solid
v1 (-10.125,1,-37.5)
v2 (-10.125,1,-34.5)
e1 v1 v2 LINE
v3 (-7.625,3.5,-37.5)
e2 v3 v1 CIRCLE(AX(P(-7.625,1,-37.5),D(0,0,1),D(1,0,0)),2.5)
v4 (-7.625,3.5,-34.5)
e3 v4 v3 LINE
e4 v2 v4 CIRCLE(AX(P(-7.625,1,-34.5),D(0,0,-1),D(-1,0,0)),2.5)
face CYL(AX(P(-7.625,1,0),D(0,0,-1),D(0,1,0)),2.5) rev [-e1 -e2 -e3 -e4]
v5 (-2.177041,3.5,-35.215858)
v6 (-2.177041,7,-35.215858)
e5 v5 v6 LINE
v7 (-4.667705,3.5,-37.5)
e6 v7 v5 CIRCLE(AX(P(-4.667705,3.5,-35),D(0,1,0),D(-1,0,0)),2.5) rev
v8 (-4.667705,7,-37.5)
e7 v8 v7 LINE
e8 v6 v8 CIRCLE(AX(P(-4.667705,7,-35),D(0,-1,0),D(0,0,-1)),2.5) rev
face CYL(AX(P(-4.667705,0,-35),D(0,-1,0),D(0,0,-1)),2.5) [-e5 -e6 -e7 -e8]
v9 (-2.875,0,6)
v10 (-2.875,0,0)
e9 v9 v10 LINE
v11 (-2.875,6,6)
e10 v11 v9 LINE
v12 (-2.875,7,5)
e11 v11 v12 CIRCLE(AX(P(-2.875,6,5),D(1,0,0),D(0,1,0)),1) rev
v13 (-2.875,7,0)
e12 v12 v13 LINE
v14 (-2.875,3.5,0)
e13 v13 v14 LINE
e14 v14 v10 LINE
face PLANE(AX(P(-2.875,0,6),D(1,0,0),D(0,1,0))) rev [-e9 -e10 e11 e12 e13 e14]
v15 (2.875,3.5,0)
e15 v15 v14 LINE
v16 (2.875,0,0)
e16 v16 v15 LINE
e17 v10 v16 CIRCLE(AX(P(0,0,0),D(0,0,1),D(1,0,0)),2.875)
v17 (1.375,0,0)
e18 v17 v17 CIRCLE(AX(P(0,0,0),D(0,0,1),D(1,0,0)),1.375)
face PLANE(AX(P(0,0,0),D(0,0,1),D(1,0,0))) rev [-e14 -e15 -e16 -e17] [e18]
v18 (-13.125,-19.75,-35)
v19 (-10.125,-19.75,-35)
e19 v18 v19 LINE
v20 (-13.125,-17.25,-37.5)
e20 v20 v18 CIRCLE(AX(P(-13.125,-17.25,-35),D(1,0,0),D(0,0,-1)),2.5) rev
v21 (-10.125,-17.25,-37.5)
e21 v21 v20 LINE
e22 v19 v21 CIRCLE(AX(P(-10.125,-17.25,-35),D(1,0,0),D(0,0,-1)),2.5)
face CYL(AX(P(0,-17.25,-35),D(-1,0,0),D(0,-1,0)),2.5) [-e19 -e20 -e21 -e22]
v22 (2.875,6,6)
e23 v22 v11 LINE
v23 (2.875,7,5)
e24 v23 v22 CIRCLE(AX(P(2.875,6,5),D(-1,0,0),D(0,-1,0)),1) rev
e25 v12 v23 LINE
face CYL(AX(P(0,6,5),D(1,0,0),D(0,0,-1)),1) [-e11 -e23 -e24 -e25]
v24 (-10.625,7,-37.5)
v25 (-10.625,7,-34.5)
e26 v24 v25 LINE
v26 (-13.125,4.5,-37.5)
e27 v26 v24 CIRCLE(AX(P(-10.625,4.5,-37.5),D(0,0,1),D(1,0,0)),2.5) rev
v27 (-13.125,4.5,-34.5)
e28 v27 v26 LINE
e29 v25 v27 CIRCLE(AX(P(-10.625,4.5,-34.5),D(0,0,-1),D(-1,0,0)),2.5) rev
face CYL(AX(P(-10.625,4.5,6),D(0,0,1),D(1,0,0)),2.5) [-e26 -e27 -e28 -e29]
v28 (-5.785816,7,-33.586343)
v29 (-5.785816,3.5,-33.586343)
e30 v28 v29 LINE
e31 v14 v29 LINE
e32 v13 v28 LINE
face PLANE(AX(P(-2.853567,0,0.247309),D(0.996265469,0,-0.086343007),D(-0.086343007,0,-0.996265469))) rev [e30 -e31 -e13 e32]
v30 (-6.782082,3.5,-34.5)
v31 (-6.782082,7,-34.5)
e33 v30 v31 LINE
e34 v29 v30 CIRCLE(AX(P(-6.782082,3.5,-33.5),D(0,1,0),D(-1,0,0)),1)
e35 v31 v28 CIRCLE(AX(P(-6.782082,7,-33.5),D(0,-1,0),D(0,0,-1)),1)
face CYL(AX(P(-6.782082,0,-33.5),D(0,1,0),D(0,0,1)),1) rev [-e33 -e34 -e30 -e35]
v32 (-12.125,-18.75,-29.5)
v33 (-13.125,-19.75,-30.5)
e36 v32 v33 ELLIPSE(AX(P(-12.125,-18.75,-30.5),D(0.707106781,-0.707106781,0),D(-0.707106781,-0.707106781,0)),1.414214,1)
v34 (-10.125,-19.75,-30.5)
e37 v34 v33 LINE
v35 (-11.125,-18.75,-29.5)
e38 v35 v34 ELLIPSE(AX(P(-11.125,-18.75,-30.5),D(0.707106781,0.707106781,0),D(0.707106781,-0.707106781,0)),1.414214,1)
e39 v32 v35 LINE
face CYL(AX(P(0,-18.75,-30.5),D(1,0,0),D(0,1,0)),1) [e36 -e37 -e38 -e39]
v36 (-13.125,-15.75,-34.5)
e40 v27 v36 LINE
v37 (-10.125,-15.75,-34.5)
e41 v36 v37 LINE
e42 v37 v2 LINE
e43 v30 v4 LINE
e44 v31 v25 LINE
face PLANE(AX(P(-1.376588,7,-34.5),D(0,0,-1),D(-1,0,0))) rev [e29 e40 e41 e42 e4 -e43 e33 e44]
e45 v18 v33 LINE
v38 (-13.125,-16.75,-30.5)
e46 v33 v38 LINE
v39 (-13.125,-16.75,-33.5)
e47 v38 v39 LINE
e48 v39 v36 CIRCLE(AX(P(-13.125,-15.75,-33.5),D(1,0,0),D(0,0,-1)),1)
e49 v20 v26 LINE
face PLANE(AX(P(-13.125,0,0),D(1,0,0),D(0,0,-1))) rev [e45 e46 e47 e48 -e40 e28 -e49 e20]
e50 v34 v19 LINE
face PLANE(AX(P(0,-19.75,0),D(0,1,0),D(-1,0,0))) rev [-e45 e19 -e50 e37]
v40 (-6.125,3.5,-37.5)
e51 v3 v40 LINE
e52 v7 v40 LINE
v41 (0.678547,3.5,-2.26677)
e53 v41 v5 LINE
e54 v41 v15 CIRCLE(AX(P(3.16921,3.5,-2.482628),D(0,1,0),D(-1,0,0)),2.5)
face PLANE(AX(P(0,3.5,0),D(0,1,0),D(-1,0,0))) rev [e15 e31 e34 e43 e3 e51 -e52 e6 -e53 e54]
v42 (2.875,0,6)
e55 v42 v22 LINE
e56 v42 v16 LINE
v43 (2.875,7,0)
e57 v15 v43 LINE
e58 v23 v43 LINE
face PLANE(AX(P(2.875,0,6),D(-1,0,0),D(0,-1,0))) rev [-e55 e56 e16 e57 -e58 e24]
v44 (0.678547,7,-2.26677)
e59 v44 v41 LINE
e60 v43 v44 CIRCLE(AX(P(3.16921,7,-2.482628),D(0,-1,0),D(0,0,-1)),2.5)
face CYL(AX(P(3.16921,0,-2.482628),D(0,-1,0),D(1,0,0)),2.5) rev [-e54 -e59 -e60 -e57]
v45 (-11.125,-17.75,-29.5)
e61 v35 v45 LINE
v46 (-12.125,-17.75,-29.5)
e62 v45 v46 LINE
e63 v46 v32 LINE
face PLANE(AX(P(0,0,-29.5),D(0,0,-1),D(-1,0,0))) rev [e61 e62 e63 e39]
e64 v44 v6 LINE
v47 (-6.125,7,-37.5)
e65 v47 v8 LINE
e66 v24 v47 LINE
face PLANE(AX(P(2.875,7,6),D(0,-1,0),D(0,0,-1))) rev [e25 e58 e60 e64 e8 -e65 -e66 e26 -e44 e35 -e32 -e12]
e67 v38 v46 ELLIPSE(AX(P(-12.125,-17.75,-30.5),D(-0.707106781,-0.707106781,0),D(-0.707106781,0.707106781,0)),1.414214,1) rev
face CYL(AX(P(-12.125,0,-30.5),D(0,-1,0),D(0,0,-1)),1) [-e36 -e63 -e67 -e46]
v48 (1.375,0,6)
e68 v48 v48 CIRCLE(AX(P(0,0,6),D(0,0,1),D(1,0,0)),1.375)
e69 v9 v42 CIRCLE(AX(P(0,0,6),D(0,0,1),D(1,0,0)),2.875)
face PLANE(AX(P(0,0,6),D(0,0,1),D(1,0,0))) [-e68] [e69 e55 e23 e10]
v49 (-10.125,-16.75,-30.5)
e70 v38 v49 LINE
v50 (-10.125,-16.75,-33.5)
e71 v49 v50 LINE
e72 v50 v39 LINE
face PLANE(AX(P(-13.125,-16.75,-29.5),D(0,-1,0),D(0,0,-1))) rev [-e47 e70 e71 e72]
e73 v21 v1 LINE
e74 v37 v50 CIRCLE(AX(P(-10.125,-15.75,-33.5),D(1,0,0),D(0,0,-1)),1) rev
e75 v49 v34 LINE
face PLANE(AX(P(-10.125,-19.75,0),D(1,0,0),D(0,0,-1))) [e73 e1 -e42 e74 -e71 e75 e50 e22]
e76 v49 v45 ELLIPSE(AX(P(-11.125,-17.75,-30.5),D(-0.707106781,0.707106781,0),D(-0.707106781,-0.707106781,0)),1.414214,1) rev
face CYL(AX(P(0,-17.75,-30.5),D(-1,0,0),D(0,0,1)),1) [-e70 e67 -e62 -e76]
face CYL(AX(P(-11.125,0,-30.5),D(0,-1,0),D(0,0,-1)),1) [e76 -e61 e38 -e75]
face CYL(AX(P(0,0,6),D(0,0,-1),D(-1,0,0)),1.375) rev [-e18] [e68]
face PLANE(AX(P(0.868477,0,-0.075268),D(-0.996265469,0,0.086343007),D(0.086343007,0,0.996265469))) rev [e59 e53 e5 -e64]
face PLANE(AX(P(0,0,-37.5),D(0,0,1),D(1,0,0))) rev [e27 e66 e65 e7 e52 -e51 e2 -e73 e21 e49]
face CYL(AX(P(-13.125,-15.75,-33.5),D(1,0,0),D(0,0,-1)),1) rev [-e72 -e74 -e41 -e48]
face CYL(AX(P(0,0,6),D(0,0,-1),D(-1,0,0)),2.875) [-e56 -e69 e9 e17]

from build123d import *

# Parameters (mm, degrees)
SKETCH1_R           = 1.375
BOSS_EXTRUDE1_DEPTH = 6
BOSS_EXTRUDE2_START = -13.125
SKETCH9_W           = 3.5
SKETCH9_H           = 3
BOSS_EXTRUDE2_DEPTH = 7.26
BOSS_EXTRUDE3_START = -26.75
SKETCH10_W          = 3
SKETCH10_H          = 3
BOSS_EXTRUDE3_DEPTH = 23.25
SKETCH11_W          = 3
SKETCH11_H          = 3
BOSS_EXTRUDE4_DEPTH = 5
FILLET1_R           = 2.5
FILLET2_R           = 1


with BuildPart() as part:
    # Sketch1 → Boss-Extrude1 (new body)
    with BuildSketch(Plane(origin=(0, 0, 0), x_dir=(0, 1, 0), z_dir=(0, 0, 1))):
        with BuildLine():
            Line((0, 2.875), (7, 2.875))
            Line((7, 2.875), (7, -2.875))
            Line((7, -2.875), (0, -2.875))
            ThreePointArc((0, -2.875), (-2.875, 0), (0, 2.875))
        make_face()
        with Locations(Location((0, 0, 0), (0, 0, 270))):
            Circle(SKETCH1_R, mode=Mode.SUBTRACT)
    extrude(amount=BOSS_EXTRUDE1_DEPTH)

    # Sketch2 → Loft1 section 0
    with BuildSketch(Plane(origin=(0, 0, 0), x_dir=(1, 0, 0), z_dir=(0, 0, -1))):
        with BuildLine():
            Line((0.875, -7), (-2.875, -7))
            Line((-2.875, -7), (-2.875, -3.5))
            Line((-2.875, -3.5), (0.875, -3.5))
            Line((0.875, -3.5), (0.875, -7))
        make_face()
    # Sketch8 → Loft1 section 1
    with BuildSketch(Plane(origin=(0, 0, -37.5), x_dir=(-1, 0, 0), z_dir=(0, 0, -1))):
        with BuildLine():
            Line((2.375, 3.5), (2.375, 7))
            Line((2.375, 7), (6.125, 7))
            Line((6.125, 7), (6.125, 3.5))
            Line((6.125, 3.5), (2.375, 3.5))
        make_face()
    loft()

    # Sketch9 → Boss-Extrude2 (add)
    with BuildSketch(Plane.YZ.offset(BOSS_EXTRUDE2_START)):
        with Locations((5.25, -36)):
            Rectangle(SKETCH9_W, SKETCH9_H)
    extrude(amount=BOSS_EXTRUDE2_DEPTH)

    # Sketch10 → Boss-Extrude3 (add)
    with BuildSketch(Plane(origin=(0, 7, 0), x_dir=(-1, 0, 0), z_dir=(0, 1, 0)).offset(BOSS_EXTRUDE3_START)):
        with Locations((11.625, -36)):
            Rectangle(SKETCH10_W, SKETCH10_H)
    extrude(amount=BOSS_EXTRUDE3_DEPTH)

    # Sketch11 → Boss-Extrude4 (add)
    with BuildSketch(Plane.XY.offset(-34.5)):
        with Locations((-11.625, -18.25)):
            Rectangle(SKETCH11_W, SKETCH11_H)
    extrude(amount=BOSS_EXTRUDE4_DEPTH)

    # Fillet1
    # the kernel refuses this fillet: 2.5 mm, written as the material it adds along each edge
    with BuildSketch(Plane(origin=(-10.125, 3.5, -37.5), x_dir=(1, 0, 0), z_dir=(0, 0, 1))) as fillet1_piece_1:
        with BuildLine():
            CenterArc((FILLET1_R, -FILLET1_R), FILLET1_R, 90, 90)
            Line((0, -FILLET1_R), (0, 0))
            Line((0, 0), (FILLET1_R, 0))
        make_face()
    extrude(amount=3)
    with BuildSketch(Plane(origin=(0.875, 3.5, 0), x_dir=(-0.08634300732914678, 0, -0.9962654691824658), z_dir=(0, 1, 0))) as fillet1_piece_2:
        with BuildLine():
            CenterArc((2.275267243, -2.5), FILLET1_R, 90, 78.288278187)
            Line((-0.172686015, -1.992530938), (0, 0))
            Line((0, 0), (2.275267243, 0))
        make_face()
    extrude(amount=3.5)
    # the kernel refuses this fillet: 2.5 mm, written as the material it takes off along each edge
    with BuildSketch(Plane(origin=(-2.375, -2.231761645, -37.5), x_dir=(-1, 0, 0), z_dir=(0, 1, 0))) as fillet1_2_piece_1:
        with BuildLine():
            CenterArc((FILLET1_R * 0.917081863151, FILLET1_R), FILLET1_R, 184.953257478, 85.046742522)
            Line((-FILLET1_R * 0.0791836060315, FILLET1_R * 0.913656992671), (0, 0))
            Line((0, 0), (FILLET1_R * 0.917081863151, 0))
        make_face()
    extrude(amount=14.963523289, mode=Mode.SUBTRACT)
    with BuildSketch(Plane(origin=(-13.125, 7, -43.75), x_dir=(0, -1, 0), z_dir=(0, 0, 1))) as fillet1_2_piece_2:
        with BuildLine():
            CenterArc((FILLET1_R, FILLET1_R), FILLET1_R, 180, 90)
            Line((0, FILLET1_R), (0, 0))
            Line((0, 0), (FILLET1_R, 0))
        make_face()
    extrude(amount=15.5, mode=Mode.SUBTRACT)
    with BuildSketch(Plane(origin=(-19.375, -19.75, -37.5), x_dir=(0, 0, 1), z_dir=(1, 0, 0))) as fillet1_2_piece_3:
        with BuildLine():
            CenterArc((FILLET1_R, -FILLET1_R), FILLET1_R, 90, 90)
            Line((0, -FILLET1_R), (0, 0))
            Line((0, 0), (FILLET1_R, 0))
        make_face()
    extrude(amount=15.5, mode=Mode.SUBTRACT)

    # Fillet2
    fillet2_edges = [part.edges().sort_by_distance(p)[0] for p in [
        (0, 7, 6),
        (-5.865, 5.25, -34.5),
        (-11.625, -16.75, -34.5),
        (-11.625, -16.75, -29.5),
        (-13.125, -18.25, -29.5),
        (-11.625, -19.75, -29.5),
        (-10.125, -18.25, -29.5),
    ]]
    fillet(fillet2_edges, radius=FILLET2_R)


solid = part.part
